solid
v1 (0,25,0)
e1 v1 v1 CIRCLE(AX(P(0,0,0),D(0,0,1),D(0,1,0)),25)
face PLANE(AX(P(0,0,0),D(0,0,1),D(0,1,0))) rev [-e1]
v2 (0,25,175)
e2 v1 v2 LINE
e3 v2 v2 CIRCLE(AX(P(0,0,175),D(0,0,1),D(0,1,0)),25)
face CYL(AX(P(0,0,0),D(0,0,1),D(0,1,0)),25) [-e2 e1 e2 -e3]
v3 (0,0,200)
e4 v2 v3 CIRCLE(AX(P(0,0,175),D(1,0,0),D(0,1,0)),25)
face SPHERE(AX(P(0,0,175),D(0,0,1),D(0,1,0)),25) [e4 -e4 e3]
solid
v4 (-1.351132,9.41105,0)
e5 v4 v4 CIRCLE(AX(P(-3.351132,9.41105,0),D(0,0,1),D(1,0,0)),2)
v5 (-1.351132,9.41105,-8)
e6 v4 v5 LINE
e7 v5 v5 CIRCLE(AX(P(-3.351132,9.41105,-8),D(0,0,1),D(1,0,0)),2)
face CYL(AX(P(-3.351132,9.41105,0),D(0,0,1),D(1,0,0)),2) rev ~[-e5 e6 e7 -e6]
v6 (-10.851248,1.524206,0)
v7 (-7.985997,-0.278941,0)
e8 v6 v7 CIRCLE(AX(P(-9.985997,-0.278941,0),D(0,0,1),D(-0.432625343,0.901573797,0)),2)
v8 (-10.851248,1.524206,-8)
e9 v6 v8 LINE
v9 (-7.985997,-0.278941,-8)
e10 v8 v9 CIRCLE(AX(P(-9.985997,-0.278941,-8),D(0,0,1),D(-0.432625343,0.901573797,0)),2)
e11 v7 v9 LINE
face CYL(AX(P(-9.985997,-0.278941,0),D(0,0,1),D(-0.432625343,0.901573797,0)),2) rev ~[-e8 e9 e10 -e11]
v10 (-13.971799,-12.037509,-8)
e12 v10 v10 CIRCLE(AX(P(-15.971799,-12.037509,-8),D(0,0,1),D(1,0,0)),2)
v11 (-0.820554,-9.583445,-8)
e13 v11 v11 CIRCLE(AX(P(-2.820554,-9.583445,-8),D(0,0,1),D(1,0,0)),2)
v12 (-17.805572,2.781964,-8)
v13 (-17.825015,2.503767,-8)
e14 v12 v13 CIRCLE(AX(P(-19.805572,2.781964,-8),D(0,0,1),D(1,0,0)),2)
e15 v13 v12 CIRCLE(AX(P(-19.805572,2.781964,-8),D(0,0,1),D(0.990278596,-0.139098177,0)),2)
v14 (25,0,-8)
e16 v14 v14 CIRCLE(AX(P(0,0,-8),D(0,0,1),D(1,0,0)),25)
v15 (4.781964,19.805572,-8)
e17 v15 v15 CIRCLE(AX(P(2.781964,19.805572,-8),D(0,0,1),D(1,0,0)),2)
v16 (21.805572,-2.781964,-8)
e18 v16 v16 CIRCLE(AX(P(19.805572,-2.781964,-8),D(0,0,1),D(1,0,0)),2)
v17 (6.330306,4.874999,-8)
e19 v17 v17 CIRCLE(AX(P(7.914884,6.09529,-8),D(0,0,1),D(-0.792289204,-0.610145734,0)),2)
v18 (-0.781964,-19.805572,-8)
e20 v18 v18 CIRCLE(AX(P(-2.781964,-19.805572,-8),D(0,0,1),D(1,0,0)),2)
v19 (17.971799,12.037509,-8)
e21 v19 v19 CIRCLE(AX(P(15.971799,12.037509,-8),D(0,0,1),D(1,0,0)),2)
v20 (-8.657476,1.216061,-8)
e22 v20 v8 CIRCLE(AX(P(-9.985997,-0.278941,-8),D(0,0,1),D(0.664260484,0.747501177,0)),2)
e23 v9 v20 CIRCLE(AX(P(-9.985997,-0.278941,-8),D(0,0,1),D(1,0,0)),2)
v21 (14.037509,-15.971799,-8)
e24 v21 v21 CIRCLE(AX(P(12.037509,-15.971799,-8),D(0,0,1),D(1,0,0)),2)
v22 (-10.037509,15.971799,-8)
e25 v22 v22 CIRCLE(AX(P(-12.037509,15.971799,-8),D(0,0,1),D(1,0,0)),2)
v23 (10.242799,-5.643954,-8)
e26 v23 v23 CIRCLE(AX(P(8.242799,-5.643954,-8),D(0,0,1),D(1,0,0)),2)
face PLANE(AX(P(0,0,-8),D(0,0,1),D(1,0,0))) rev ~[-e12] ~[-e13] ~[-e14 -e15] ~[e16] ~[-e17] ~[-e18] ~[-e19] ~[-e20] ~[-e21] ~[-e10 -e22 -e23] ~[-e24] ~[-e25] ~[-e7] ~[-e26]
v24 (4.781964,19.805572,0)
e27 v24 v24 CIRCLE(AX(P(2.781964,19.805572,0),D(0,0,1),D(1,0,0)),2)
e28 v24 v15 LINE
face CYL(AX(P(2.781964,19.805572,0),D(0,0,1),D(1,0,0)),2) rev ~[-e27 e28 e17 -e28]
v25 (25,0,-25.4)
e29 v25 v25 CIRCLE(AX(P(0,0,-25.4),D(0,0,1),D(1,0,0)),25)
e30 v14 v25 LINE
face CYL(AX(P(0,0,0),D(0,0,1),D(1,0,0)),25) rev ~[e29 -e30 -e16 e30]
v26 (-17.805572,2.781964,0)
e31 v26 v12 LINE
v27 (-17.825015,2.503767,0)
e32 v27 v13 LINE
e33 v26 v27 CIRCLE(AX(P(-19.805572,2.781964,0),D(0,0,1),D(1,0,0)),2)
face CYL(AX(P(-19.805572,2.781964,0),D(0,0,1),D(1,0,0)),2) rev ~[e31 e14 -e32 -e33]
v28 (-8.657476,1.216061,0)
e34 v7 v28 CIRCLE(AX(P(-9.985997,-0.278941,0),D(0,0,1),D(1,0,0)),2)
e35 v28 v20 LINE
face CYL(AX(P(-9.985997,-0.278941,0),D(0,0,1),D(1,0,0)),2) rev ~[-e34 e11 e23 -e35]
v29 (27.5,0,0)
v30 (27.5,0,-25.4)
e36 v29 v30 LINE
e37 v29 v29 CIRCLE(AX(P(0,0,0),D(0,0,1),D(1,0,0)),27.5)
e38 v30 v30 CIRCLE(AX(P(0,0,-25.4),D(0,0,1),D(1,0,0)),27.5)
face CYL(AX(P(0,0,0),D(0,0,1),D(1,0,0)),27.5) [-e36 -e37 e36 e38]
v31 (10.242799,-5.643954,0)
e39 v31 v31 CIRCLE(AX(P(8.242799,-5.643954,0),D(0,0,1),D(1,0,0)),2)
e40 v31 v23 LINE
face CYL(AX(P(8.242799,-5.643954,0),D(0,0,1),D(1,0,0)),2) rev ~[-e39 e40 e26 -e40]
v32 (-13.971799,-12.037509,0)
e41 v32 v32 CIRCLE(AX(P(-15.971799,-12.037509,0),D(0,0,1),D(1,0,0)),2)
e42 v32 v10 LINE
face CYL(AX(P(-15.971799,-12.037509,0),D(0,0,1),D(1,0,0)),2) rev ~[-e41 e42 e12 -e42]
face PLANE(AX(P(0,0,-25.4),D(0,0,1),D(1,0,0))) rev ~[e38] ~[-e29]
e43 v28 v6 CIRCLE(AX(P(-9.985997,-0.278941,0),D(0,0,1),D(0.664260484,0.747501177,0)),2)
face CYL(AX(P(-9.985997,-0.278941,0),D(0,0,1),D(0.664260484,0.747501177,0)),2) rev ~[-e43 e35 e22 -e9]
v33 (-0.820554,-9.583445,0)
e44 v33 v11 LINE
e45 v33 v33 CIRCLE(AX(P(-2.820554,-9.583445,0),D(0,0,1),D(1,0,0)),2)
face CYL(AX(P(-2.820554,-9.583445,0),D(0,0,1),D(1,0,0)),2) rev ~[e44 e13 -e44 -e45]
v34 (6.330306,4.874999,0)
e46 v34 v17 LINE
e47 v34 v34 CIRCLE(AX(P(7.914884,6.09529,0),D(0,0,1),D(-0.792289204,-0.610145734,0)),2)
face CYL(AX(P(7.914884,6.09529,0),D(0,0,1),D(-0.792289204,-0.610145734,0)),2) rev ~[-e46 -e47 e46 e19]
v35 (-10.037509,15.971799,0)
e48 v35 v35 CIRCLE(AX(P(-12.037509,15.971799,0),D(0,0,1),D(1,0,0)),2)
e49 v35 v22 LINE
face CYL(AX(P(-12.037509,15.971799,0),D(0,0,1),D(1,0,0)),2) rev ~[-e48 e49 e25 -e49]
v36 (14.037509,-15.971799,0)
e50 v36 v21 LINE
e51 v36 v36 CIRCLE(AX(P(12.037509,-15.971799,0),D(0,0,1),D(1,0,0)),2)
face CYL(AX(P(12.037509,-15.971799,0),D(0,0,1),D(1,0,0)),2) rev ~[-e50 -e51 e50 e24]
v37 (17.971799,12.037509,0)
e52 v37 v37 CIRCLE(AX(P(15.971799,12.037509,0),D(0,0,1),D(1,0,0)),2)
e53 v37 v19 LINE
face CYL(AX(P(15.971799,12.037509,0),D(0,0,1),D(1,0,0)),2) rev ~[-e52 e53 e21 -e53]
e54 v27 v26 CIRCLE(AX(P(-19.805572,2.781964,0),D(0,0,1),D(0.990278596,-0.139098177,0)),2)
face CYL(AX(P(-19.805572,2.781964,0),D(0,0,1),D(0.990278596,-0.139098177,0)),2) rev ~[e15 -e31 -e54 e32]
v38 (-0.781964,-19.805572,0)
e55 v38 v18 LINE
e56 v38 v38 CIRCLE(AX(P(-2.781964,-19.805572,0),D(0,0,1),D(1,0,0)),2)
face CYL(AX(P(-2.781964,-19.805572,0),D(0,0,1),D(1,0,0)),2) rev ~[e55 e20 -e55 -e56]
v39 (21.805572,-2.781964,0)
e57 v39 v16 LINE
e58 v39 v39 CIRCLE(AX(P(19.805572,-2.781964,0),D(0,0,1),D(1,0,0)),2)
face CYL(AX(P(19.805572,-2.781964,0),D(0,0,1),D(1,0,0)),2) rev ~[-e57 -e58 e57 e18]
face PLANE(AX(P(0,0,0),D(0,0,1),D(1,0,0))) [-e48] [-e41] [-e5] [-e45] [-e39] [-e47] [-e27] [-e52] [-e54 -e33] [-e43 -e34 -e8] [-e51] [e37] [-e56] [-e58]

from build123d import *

# Parameters (mm, degrees)
F2_R     = 27.5
F2_R_2   = 25
F3_DEPTH = 25.4
F4_DEPTH = 8
F5_R     = 2
F6_DEPTH = 25


with BuildPart() as f1:
    # F0 (on Right) → F1 (revolve)
    with BuildSketch(Plane.YZ):
        with BuildLine():
            Line((0, 200), (0, 0))
            Line((0, 0), (25, 0))
            Line((25, 0), (25, 175))
            ThreePointArc((25, 175), (17.6776695297, 192.6776695297), (0, 200))
        make_face()
    revolve(axis=Axis((0, 0, 100), (0, 0, 1)))


with BuildPart() as f3:
    # F2 (on Top) → F3 (new body)
    with BuildSketch(Plane.XY):
        Circle(F2_R)
        Circle(F2_R_2, mode=Mode.SUBTRACT)
    extrude(amount=-F3_DEPTH)

    # F2 (on Top) → F4 (join)
    with BuildSketch(Plane.XY):
        Circle(F2_R_2)
    extrude(amount=-F4_DEPTH)

    # F5 (on face) → F6 (cut)
    with BuildSketch(Plane.XY):
        with BuildLine():
            ThreePointArc((9.9148839653, 6.0952902816), (7.2703518936, 7.98858857), (6.3303055567, 4.8749988135))
            ThreePointArc((6.3303055567, 4.8749988135), (8.559416037, 4.2019919933), (9.9148839653, 6.0952902816))
        make_face()
        with BuildLine():
            ThreePointArc((-17.8055719167, 2.7819635249), (-21.8007052936, 2.921400996), (-17.825014725, 2.5037671724))
            ThreePointArc((-17.825014725, 2.5037671724), (-17.8104385397, 2.6425260539), (-17.8055719167, 2.7819635249))
        make_face()
        with BuildLine():
            ThreePointArc((-7.9859973724, -0.2789413551), (-8.1615739108, 0.5404968871), (-8.6574764052, 1.2160609993))
            Line((-8.6574764052, 1.2160609993), (-10.851248059, 1.5242062399))
            ThreePointArc((-10.851248059, 1.5242062399), (-11.0512435005, -1.9716464938), (-7.9859973724, -0.2789413551))
        make_face()
        with BuildLine():
            Line((-10.851248059, 1.5242062399), (-8.6574764052, 1.2160609993))
            ThreePointArc((-8.6574764052, 1.2160609993), (-9.7078010199, 1.7016158366), (-10.851248059, 1.5242062399))
        make_face()
        with Locations((-15.971799481, -12.0375089341)):
            Circle(F5_R)
        with Locations((-2.7819635249, -19.8055719167)):
            Circle(F5_R)
        with Locations((12.0375089341, -15.971799481)):
            Circle(F5_R)
        with Locations((19.8055719167, -2.7819635249)):
            Circle(F5_R)
        with Locations((15.971799481, 12.0375089341)):
            Circle(F5_R)
        with Locations((2.7819635249, 19.8055719167)):
            Circle(F5_R)
        with Locations((-12.0375089341, 15.971799481)):
            Circle(F5_R)
        with Locations((-3.3511318873, 9.4110502536)):
            Circle(F5_R)
        with Locations((-2.8205539004, -9.5834454919)):
            Circle(F5_R)
        with Locations((8.2427991948, -5.6439536882)):
            Circle(F5_R)
    extrude(amount=-F6_DEPTH, mode=Mode.SUBTRACT)


solid = Compound([f1.part, f3.part])
